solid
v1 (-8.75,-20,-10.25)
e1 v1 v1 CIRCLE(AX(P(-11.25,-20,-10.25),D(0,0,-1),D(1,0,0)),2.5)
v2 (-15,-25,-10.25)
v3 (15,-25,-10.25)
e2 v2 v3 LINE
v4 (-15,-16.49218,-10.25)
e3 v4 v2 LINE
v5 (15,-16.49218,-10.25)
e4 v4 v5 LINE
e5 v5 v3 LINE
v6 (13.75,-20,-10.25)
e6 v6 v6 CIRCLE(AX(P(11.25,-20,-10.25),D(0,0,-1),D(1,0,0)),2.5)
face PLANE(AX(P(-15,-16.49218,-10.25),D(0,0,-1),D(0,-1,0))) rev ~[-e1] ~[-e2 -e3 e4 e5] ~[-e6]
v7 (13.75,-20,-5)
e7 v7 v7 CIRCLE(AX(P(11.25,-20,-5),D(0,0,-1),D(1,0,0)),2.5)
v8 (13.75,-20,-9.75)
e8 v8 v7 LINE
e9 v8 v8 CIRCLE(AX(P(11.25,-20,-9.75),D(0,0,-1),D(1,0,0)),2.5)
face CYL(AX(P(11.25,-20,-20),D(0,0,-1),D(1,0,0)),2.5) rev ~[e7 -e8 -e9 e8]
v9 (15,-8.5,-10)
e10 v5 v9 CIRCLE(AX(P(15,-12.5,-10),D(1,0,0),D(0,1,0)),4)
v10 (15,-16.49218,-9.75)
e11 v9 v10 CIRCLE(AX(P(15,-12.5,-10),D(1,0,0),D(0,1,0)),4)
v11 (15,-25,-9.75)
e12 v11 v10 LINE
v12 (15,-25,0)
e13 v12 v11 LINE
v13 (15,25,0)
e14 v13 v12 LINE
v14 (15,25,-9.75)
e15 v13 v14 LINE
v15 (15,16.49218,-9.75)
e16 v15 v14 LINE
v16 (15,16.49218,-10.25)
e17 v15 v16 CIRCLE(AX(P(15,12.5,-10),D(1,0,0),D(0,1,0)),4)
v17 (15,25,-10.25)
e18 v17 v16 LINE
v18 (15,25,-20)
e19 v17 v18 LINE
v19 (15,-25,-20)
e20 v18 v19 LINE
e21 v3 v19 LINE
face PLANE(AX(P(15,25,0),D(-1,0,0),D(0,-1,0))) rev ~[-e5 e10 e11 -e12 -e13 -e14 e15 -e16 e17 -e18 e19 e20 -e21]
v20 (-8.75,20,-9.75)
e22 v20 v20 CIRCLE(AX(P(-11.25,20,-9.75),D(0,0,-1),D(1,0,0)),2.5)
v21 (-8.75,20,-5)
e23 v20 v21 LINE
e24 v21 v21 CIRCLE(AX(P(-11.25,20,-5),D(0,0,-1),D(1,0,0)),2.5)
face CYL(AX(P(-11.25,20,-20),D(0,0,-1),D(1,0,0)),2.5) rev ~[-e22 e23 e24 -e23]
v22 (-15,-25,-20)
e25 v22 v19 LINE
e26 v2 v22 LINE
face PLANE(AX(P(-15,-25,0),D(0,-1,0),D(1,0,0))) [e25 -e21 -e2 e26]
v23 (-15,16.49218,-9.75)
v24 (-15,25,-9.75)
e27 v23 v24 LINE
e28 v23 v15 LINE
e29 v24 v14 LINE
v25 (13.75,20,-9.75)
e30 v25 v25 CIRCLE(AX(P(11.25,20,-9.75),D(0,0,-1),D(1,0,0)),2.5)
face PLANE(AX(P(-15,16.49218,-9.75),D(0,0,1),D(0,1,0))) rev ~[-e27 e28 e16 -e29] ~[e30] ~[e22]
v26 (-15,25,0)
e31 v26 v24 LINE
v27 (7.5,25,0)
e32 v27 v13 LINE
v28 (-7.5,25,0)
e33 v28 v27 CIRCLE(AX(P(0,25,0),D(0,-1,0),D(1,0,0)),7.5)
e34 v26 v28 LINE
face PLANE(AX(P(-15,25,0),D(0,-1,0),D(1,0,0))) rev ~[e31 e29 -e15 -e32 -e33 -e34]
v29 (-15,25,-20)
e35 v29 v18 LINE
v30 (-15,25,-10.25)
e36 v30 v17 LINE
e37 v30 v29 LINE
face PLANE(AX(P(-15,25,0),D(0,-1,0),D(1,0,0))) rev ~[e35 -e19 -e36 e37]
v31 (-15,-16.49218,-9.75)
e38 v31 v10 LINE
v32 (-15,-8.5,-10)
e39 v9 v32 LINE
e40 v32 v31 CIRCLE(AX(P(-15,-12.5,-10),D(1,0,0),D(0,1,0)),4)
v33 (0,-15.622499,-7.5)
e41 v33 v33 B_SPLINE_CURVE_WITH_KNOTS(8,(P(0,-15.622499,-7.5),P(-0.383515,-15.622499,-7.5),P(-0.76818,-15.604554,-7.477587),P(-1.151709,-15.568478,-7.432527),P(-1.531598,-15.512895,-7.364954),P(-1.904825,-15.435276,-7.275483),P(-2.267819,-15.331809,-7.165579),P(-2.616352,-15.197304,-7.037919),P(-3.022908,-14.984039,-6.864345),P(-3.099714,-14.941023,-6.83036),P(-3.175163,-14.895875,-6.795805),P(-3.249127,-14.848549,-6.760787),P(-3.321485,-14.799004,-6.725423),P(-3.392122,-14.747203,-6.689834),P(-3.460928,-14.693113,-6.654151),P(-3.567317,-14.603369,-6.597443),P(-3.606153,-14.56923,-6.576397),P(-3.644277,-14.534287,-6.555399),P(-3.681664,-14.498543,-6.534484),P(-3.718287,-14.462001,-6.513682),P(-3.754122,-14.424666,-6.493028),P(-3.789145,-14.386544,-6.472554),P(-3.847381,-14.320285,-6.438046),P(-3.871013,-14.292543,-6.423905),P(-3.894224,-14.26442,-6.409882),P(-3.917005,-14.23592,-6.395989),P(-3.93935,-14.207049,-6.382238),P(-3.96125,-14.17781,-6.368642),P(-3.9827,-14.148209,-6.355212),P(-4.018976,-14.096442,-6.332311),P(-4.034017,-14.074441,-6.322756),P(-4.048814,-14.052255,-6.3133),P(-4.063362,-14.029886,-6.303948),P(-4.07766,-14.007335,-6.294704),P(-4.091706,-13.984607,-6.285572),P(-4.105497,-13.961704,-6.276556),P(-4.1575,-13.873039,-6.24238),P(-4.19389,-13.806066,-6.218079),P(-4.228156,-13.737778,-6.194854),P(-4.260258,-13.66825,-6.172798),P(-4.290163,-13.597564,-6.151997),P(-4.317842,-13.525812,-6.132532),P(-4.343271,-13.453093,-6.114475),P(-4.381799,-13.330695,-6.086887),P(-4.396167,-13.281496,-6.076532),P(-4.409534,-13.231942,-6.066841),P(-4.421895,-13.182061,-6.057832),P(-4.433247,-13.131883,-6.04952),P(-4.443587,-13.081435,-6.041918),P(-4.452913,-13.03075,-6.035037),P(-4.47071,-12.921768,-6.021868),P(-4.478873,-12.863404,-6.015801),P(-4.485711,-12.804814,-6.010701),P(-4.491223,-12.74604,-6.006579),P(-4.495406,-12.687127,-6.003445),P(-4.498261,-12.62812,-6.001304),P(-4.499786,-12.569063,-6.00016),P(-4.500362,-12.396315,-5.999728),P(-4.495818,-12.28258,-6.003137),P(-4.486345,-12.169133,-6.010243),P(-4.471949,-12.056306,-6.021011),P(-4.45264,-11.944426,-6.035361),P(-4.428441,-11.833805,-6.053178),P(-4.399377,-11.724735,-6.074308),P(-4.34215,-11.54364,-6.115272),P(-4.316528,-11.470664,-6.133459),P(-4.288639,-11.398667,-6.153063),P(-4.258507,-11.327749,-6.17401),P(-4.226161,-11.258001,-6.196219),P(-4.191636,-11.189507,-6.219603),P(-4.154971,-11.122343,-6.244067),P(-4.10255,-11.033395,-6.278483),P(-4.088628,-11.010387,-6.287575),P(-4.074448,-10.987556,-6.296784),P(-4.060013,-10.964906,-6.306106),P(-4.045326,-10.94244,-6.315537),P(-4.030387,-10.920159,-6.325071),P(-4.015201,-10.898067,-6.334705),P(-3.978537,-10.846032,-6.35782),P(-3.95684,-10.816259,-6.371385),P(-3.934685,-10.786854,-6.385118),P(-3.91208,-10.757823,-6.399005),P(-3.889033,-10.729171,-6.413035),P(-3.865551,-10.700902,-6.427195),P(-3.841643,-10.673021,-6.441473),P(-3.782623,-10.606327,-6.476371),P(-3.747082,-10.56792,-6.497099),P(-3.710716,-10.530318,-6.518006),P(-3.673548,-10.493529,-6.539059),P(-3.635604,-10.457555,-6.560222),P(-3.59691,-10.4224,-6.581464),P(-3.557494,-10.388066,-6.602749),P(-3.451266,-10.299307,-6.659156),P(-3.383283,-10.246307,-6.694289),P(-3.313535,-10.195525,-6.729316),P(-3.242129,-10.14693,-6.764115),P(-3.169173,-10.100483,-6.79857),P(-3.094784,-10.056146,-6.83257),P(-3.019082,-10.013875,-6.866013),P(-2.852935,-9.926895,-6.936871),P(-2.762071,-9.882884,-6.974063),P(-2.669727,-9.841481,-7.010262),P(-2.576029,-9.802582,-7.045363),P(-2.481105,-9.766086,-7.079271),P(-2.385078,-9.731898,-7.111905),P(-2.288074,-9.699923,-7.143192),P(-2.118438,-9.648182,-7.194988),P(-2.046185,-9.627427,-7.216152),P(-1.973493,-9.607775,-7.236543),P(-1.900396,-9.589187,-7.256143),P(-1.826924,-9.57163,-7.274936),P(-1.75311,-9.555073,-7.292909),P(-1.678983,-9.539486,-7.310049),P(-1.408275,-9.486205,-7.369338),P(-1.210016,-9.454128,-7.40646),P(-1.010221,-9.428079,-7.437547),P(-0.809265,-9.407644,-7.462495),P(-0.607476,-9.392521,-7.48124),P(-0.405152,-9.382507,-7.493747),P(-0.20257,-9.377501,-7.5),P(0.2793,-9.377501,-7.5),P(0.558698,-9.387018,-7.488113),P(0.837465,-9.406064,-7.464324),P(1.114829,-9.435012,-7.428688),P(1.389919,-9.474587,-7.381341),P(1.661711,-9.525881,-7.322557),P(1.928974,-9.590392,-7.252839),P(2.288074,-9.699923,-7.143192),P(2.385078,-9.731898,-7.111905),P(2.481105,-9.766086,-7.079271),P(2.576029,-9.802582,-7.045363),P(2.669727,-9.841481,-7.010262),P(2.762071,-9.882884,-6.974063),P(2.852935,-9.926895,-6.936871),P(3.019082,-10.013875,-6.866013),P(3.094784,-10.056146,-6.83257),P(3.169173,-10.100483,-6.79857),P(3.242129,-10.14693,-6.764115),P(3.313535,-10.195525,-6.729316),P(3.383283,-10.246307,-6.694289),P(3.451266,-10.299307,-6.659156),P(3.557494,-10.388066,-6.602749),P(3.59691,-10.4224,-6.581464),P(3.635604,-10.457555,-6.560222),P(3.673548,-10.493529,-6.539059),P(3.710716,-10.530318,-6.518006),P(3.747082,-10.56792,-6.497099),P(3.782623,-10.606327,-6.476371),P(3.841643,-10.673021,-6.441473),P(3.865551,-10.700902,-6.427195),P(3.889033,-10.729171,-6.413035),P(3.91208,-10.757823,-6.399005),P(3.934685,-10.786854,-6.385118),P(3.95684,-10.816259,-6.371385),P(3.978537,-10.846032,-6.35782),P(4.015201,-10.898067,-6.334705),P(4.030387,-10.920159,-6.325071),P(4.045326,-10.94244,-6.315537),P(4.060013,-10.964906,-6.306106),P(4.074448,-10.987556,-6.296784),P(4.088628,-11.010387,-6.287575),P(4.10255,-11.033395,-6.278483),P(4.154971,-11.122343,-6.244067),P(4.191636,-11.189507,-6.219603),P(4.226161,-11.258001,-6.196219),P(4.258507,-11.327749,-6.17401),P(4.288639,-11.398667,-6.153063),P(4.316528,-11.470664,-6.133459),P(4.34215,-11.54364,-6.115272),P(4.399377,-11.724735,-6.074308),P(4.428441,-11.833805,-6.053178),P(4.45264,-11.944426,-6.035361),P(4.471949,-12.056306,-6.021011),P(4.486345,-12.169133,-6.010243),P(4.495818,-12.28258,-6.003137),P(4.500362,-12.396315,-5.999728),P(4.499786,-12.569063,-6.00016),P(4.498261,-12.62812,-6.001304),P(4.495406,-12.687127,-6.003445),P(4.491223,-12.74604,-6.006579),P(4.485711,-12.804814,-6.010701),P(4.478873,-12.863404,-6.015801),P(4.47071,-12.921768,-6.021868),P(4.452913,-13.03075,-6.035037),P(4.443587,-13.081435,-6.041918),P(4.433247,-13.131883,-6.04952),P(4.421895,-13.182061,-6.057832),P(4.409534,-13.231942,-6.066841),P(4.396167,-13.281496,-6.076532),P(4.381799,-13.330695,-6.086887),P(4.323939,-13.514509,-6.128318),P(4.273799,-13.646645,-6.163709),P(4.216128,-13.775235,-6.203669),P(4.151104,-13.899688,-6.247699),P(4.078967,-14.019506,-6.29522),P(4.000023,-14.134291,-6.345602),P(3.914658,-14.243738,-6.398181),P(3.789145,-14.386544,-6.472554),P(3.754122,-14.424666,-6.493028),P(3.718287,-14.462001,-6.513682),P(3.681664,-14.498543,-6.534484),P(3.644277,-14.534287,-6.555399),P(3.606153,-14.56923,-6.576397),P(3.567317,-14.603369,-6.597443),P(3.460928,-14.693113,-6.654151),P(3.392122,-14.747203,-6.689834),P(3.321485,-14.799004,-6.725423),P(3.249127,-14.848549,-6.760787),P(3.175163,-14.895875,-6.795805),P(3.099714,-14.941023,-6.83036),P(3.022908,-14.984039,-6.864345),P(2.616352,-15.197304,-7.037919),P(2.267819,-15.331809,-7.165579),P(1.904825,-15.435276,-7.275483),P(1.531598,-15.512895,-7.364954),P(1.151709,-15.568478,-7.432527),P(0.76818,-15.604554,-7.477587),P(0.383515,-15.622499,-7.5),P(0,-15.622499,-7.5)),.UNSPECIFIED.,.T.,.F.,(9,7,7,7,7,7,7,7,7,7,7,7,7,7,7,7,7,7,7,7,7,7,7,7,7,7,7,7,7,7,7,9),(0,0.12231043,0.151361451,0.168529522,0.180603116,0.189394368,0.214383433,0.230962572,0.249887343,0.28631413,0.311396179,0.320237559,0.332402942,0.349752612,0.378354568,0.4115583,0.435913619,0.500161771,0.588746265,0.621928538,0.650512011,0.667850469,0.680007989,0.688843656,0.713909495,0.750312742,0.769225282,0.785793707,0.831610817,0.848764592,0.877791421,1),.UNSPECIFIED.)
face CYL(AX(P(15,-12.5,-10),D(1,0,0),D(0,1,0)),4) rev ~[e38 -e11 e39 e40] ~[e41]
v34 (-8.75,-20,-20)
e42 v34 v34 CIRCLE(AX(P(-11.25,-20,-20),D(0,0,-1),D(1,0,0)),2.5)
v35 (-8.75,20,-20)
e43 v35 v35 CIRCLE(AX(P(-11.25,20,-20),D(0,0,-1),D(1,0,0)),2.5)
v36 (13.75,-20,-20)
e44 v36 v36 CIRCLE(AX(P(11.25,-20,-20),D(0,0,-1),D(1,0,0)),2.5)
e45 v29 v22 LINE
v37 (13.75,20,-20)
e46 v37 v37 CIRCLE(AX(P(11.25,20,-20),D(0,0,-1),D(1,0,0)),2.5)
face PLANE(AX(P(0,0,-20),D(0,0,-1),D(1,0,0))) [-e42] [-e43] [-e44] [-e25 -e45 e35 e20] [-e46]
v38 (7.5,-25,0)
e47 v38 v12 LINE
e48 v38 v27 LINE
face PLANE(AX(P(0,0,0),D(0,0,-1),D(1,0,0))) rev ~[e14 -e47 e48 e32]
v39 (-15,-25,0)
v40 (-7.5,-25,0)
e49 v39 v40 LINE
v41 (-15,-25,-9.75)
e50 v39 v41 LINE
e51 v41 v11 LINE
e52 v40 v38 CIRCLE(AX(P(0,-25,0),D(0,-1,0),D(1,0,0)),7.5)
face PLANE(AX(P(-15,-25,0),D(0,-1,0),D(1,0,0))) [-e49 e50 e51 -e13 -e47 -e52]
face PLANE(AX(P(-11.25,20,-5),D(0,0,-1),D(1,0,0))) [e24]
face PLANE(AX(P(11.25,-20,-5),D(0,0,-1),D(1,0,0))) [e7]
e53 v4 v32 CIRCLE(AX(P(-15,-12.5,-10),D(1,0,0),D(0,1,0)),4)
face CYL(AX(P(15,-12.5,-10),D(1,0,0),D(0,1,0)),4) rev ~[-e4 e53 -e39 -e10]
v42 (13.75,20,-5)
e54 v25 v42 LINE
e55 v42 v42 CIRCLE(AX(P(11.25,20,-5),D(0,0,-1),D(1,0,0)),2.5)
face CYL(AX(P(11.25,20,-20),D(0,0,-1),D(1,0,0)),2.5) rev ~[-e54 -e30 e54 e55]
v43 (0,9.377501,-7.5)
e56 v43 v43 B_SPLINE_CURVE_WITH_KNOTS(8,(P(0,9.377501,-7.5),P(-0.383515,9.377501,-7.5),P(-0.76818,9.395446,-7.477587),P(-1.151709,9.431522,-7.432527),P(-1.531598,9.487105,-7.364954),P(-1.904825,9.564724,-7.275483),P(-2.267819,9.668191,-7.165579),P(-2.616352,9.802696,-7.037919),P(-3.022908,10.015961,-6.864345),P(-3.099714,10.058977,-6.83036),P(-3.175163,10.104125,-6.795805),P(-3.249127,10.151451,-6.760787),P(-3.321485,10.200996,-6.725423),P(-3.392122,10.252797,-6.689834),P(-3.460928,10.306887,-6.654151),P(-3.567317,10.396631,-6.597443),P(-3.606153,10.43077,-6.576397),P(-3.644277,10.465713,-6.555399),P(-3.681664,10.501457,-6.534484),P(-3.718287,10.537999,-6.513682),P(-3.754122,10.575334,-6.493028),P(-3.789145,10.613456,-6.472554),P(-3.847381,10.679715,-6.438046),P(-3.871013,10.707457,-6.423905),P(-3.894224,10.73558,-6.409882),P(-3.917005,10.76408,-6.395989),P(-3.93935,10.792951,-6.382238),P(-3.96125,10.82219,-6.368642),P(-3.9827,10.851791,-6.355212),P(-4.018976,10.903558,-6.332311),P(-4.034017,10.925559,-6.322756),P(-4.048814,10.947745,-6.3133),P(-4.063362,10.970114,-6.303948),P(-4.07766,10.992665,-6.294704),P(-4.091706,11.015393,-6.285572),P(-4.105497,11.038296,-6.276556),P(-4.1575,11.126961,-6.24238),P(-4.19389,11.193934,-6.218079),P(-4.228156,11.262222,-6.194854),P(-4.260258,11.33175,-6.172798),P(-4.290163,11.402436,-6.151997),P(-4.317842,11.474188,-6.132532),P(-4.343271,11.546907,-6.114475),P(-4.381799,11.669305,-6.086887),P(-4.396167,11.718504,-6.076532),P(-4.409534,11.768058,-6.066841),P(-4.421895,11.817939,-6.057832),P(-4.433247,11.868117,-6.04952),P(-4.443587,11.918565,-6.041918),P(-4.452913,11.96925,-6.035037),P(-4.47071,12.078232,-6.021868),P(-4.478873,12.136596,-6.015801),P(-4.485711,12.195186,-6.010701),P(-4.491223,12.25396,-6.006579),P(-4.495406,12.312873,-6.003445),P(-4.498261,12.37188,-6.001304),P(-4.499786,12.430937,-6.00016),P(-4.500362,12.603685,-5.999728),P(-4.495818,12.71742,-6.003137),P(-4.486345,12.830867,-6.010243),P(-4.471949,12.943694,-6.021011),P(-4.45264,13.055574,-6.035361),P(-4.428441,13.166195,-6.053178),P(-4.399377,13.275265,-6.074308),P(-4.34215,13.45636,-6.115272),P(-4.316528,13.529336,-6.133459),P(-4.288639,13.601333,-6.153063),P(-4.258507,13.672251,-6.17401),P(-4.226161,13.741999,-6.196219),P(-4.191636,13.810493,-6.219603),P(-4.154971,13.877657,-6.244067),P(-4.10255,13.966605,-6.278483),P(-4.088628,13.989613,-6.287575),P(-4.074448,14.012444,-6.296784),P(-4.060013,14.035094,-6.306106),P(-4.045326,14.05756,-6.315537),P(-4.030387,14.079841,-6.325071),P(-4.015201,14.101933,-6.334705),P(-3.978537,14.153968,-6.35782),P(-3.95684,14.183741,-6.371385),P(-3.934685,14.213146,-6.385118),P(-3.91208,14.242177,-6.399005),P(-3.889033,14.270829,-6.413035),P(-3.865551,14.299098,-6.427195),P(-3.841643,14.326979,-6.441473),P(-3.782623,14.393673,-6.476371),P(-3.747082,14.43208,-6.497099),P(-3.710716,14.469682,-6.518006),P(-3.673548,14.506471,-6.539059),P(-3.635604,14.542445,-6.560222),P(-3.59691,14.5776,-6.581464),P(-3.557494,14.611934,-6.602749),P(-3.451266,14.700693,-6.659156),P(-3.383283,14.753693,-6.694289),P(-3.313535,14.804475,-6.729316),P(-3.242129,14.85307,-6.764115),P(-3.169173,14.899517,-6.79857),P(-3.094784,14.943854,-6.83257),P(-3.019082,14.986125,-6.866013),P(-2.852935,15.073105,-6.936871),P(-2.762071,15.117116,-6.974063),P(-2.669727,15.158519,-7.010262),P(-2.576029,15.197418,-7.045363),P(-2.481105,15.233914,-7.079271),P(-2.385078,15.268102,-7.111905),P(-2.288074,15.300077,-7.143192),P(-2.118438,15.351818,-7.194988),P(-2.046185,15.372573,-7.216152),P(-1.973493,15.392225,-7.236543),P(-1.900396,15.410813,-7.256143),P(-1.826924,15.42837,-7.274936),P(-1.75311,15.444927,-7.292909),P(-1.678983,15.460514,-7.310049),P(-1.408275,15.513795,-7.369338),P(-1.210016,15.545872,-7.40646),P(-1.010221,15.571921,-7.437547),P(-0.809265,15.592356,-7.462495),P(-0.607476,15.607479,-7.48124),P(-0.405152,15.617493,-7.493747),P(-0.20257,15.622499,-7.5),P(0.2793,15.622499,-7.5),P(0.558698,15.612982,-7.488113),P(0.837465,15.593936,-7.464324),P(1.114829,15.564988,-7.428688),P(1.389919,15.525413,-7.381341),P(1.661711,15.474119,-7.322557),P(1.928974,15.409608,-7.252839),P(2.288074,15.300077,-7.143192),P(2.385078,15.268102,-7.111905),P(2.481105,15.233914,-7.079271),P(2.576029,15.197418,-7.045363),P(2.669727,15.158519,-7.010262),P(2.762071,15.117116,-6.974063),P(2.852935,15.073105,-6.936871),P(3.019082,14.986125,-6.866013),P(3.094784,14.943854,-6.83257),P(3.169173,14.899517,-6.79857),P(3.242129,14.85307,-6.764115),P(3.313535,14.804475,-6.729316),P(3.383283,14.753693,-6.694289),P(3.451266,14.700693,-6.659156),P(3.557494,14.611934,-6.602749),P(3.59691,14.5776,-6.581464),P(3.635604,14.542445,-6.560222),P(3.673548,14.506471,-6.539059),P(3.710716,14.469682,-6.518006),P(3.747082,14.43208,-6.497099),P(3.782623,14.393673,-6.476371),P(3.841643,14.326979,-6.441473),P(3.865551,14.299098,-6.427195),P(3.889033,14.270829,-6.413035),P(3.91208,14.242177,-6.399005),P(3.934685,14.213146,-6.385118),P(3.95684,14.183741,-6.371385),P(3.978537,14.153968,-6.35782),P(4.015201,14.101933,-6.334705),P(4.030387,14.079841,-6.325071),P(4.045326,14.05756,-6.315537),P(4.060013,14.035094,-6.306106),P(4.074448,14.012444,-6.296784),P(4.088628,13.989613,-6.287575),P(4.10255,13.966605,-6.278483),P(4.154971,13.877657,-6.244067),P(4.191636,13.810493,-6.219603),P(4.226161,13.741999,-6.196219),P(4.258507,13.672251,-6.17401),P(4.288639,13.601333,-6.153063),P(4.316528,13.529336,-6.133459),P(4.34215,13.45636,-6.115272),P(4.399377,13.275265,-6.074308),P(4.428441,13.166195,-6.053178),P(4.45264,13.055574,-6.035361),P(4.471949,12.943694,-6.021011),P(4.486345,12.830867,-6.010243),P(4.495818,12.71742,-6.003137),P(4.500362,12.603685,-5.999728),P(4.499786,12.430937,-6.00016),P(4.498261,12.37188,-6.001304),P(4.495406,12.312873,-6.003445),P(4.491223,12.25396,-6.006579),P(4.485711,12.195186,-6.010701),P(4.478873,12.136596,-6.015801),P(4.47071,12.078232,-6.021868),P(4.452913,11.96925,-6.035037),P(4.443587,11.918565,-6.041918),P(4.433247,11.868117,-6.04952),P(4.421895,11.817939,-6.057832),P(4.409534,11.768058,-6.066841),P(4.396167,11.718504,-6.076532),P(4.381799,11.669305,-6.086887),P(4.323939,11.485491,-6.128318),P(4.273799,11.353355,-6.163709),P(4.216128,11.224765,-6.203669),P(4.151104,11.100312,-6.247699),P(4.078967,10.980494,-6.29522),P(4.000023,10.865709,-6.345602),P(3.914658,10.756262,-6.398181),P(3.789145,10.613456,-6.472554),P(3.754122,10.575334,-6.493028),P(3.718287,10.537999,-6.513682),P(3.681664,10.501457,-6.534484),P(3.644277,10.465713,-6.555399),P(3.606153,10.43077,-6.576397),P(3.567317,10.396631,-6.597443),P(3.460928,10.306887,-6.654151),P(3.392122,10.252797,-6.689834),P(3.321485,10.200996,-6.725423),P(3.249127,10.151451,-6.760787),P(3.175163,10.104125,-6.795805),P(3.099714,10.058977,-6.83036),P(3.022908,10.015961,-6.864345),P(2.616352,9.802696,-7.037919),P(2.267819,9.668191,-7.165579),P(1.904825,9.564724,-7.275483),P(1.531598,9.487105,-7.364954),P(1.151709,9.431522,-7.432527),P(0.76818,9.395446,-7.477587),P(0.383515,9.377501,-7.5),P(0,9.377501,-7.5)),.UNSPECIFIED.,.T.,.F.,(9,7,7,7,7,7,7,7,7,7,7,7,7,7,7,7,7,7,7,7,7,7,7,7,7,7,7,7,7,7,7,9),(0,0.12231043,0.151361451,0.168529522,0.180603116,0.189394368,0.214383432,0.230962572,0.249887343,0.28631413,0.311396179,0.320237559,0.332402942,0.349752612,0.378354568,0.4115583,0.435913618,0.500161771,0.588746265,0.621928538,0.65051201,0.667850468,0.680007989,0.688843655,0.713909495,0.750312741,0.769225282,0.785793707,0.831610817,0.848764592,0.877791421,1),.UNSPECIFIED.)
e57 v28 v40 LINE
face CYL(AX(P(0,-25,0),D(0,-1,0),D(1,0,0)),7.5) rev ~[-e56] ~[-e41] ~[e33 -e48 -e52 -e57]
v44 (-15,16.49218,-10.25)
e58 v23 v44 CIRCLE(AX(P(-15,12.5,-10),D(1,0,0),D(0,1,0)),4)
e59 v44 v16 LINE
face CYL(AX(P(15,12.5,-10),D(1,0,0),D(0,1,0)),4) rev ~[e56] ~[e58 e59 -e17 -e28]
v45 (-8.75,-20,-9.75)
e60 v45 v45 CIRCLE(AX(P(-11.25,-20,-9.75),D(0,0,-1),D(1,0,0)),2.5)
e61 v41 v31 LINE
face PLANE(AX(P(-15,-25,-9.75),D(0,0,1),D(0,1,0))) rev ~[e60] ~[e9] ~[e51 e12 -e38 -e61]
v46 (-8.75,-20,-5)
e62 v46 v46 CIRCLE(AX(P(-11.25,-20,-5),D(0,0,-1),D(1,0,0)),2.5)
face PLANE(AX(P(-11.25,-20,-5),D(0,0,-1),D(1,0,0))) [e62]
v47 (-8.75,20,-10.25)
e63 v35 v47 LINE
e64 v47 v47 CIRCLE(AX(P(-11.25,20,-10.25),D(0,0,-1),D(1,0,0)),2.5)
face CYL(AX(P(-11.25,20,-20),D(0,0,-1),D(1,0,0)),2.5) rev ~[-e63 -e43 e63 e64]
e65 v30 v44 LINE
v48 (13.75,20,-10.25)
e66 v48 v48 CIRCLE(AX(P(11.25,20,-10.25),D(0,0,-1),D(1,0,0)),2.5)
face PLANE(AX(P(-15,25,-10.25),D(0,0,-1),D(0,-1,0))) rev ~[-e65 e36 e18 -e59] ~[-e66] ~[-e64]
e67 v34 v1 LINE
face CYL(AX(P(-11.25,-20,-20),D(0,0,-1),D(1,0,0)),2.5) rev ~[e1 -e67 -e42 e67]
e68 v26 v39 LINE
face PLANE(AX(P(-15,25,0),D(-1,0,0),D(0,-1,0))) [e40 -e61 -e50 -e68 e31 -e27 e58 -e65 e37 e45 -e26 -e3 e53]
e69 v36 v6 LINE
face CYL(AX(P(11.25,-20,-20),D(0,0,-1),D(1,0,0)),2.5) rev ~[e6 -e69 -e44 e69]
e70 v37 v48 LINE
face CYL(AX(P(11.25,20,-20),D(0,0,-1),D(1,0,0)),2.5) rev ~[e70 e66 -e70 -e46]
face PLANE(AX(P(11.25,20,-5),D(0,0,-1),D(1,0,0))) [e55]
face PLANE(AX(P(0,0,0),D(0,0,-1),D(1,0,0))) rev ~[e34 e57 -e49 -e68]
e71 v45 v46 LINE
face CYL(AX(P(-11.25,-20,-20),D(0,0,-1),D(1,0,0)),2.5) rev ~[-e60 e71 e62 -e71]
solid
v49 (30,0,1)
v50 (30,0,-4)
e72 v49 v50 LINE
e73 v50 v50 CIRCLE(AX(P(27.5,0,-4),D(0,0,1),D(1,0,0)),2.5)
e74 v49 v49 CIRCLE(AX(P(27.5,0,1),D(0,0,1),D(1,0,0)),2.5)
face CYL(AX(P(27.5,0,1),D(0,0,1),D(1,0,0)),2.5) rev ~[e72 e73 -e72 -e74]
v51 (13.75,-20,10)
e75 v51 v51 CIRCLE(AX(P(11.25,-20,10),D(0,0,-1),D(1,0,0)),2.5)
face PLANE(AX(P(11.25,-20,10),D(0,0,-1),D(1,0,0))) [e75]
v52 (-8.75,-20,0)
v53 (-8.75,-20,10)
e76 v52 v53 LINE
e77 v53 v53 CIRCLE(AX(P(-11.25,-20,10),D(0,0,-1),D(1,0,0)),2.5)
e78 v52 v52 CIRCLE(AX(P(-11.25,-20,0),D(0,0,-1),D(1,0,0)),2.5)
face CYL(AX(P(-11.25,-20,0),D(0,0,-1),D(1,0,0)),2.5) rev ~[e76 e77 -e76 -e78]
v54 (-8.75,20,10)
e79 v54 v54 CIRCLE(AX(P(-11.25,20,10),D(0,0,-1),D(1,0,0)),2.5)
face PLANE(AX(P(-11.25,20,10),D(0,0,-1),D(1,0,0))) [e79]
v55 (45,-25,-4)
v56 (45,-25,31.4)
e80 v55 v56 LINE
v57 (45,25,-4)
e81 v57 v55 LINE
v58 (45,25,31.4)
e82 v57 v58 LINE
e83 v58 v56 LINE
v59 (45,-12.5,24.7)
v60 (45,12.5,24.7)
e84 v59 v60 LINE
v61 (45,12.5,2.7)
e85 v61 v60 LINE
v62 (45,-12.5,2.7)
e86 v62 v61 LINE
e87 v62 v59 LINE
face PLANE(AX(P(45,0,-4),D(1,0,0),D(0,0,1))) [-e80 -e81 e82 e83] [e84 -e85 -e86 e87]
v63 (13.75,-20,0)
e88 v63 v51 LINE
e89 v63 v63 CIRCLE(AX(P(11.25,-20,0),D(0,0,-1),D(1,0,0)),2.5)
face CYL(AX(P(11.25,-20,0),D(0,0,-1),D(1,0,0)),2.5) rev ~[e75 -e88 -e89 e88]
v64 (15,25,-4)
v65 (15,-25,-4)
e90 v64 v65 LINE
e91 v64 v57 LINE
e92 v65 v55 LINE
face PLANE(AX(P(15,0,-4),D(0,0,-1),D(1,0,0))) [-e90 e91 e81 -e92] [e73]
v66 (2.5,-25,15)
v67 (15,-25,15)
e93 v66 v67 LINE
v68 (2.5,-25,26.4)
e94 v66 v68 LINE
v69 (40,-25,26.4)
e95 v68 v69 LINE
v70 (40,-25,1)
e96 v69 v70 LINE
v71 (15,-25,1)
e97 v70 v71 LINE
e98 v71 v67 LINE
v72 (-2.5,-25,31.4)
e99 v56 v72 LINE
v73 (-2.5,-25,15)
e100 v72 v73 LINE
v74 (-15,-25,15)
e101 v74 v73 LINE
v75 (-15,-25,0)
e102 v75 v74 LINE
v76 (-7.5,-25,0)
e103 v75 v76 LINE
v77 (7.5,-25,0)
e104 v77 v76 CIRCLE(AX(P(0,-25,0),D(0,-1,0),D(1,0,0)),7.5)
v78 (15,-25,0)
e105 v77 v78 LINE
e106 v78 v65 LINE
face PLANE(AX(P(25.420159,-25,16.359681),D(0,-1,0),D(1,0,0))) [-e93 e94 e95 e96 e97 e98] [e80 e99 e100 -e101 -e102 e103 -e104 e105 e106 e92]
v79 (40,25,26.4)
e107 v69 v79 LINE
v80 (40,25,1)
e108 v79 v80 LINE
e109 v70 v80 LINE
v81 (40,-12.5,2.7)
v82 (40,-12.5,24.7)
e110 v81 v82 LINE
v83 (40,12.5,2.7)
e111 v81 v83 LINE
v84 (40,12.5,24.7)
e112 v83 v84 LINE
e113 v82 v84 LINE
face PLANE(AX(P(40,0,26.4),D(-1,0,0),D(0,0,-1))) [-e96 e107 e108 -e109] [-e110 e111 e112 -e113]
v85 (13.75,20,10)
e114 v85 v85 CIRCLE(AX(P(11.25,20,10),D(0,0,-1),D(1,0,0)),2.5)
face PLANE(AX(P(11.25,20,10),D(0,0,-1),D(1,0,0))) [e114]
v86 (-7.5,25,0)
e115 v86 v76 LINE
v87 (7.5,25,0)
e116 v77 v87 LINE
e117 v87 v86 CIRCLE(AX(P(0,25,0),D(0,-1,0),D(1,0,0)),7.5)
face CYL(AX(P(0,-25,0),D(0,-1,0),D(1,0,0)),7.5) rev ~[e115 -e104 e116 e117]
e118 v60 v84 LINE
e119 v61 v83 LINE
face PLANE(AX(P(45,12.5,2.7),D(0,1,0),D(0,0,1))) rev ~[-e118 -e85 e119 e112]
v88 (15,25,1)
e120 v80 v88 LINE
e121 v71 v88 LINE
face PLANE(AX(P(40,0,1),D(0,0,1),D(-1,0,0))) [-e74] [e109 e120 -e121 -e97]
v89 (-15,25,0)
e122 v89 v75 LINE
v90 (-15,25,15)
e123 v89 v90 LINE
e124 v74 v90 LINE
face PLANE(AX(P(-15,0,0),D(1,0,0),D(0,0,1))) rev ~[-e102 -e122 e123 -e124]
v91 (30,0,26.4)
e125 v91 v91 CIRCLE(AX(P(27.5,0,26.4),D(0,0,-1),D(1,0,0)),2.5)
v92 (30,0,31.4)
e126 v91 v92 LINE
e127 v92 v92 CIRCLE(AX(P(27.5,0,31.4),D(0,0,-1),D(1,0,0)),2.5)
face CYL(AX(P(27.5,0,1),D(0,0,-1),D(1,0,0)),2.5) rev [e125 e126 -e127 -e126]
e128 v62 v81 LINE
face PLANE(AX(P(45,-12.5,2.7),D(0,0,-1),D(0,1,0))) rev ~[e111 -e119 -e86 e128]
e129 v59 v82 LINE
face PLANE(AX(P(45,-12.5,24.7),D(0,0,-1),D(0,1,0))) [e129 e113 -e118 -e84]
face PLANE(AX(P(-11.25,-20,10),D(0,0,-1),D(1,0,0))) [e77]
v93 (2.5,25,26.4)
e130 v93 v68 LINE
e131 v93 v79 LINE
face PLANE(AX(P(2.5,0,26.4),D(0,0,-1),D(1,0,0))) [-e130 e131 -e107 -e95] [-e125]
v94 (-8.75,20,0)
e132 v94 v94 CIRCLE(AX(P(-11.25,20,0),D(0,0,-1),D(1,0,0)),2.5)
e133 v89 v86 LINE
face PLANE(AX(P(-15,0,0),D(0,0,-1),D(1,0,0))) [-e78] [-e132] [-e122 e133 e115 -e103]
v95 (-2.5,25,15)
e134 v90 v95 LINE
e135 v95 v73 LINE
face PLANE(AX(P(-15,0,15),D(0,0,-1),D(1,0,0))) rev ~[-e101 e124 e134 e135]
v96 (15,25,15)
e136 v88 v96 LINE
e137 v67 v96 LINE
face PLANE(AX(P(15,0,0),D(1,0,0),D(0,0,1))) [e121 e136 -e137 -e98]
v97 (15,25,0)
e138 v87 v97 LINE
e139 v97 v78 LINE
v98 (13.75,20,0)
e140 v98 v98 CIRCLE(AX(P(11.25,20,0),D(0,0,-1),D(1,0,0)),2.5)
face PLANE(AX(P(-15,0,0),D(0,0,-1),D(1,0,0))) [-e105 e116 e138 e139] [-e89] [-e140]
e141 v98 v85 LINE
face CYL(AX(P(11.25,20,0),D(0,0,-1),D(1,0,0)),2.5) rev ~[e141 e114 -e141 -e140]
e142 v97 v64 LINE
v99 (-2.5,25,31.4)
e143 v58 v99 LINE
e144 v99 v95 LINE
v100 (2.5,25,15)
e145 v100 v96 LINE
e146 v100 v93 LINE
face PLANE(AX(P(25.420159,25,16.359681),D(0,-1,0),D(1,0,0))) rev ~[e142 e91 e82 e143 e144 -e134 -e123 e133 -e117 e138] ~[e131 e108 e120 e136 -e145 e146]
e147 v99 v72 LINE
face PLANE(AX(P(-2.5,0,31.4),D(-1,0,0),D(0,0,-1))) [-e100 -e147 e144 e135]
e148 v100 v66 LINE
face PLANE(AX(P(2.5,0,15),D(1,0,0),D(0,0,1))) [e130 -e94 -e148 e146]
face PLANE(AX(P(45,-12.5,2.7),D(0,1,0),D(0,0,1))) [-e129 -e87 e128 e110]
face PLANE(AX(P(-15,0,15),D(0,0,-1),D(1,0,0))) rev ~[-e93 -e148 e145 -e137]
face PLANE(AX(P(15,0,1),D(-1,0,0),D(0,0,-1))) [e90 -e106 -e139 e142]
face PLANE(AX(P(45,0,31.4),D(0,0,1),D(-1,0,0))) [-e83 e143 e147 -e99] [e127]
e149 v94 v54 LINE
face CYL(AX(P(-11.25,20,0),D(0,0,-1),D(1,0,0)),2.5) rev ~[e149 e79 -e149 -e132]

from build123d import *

# Parameters (mm, degrees)
F0_W           = 30
F0_H           = 15
F1_DEPTH       = 25
F2_R           = 7.5
F3_DEPTH       = 50.001
F4_R           = 2.5
F5_DEPTH       = 10
F6_W           = 30
F6_H           = 50
F7_DEPTH       = 20
F8_R           = 7.5
F9_DEPTH       = 50.001
F10_R          = 2.5
F11_DEPTH      = 15
F12_R          = 4
F13_DEPTH      = 30.001
F15_DEPTH      = 30.0010001
F17_DEPTH      = 25
F18_R          = 2.5
F19_DEPTH      = 21.001
F19_DEPTH_BACK = 30.401
F20_W          = 25
F20_H          = 22
F21_DEPTH      = 5


with BuildPart() as f1:
    # F0 (on Front) → F1 (new body, symmetric)
    with BuildSketch(Plane.XZ):
        with Locations((0, 7.5)):
            Rectangle(F0_W, F0_H)
    extrude(amount=F1_DEPTH, both=True)

    # F2 (on face) → F3 (cut, through all)
    with BuildSketch(Plane.XZ.offset(25)):
        Circle(F2_R)
    extrude(amount=-F3_DEPTH, mode=Mode.SUBTRACT)

    # F4 (on face) → F5 (cut)
    with BuildSketch(Plane(origin=(0, 0, 0), x_dir=(1, 0, 0), z_dir=(0, 0, -1))):
        with Locations((-11.25, 20)):
            Circle(F4_R)
        with Locations((-11.25, -20)):
            Circle(F4_R)
        with Locations((11.25, 20)):
            Circle(F4_R)
        with Locations((11.25, -20)):
            Circle(F4_R)
    extrude(amount=-F5_DEPTH, mode=Mode.SUBTRACT)

    # F16 (on Front) → F17 (join, symmetric)
    with BuildSketch(Plane.XZ):
        Polygon((15, 1), (15, -4), (45, -4), (45, 31.4), (-2.5, 31.4), (-2.5, 15), (2.5, 15), (2.5, 26.4), (40, 26.4), (40, 1), align=None)
    extrude(amount=F17_DEPTH, both=True)

    # F18 (on face) → F19 (cut, two sides)
    with BuildSketch(Plane.XY.offset(1)) as f19_sk:
        with Locations((27.5, 0)):
            Circle(F18_R)
    extrude(amount=-F19_DEPTH, mode=Mode.SUBTRACT)
    extrude(f19_sk.sketch, amount=F19_DEPTH_BACK, mode=Mode.SUBTRACT)

    # F20 (on face) → F21 (cut, through all)
    with BuildSketch(Plane.YZ.offset(45)):
        with Locations((0, 13.7)):
            Rectangle(F20_W, F20_H)
    extrude(amount=-F21_DEPTH, mode=Mode.SUBTRACT)


with BuildPart() as f7:
    # F6 (on face) → F7 (new body)
    with BuildSketch(Plane(origin=(0, 0, 0), x_dir=(1, 0, 0), z_dir=(0, 0, -1))):
        Rectangle(F6_W, F6_H)
    extrude(amount=F7_DEPTH)

    # F8 (on face) → F9 (cut, through all)
    with BuildSketch(Plane.XZ.offset(25)):
        Circle(F8_R)
    extrude(amount=-F9_DEPTH, mode=Mode.SUBTRACT)

    # F10 (on face) → F11 (cut)
    with BuildSketch(Plane(origin=(0, 0, -20), x_dir=(1, 0, 0), z_dir=(0, 0, -1))):
        with Locations((-11.25, 20)):
            Circle(F10_R)
        with Locations((11.25, 20)):
            Circle(F10_R)
        with Locations((11.25, -20)):
            Circle(F10_R)
        with Locations((-11.25, -20)):
            Circle(F10_R)
    extrude(amount=-F11_DEPTH, mode=Mode.SUBTRACT)

    # F12 (on face) → F13 (cut, through all)
    with BuildSketch(Plane.YZ.offset(15)):
        with Locations((-12.5, -10)):
            Circle(F12_R)
        with Locations((12.5, -10)):
            Circle(F12_R)
    extrude(amount=-F13_DEPTH, mode=Mode.SUBTRACT)

    # F14 (on face) → F15 (cut, through all)
    with BuildSketch(Plane(origin=(-15, 0, 0), x_dir=(0, -1, 0), z_dir=(-1, 0, 0))):
        with BuildLine():
            Line((-16.4921798557, -9.75), (-25, -9.75))
            Line((-25, -9.75), (-25, -10.25))
            Line((-25, -10.25), (-16.4921798557, -10.25))
            ThreePointArc((-16.4921798557, -10.25), (-16.5, -10), (-16.4921798557, -9.75))
        make_face()
        with BuildLine():
            Line((25, -10.25), (25, -9.75))
            Line((25, -9.75), (16.4921798557, -9.75))
            ThreePointArc((16.4921798557, -9.75), (16.5, -10), (16.4921798557, -10.25))
            Line((16.4921798557, -10.25), (25, -10.25))
        make_face()
    extrude(amount=-F15_DEPTH, mode=Mode.SUBTRACT)


solid = Compound([f1.part, f7.part])
